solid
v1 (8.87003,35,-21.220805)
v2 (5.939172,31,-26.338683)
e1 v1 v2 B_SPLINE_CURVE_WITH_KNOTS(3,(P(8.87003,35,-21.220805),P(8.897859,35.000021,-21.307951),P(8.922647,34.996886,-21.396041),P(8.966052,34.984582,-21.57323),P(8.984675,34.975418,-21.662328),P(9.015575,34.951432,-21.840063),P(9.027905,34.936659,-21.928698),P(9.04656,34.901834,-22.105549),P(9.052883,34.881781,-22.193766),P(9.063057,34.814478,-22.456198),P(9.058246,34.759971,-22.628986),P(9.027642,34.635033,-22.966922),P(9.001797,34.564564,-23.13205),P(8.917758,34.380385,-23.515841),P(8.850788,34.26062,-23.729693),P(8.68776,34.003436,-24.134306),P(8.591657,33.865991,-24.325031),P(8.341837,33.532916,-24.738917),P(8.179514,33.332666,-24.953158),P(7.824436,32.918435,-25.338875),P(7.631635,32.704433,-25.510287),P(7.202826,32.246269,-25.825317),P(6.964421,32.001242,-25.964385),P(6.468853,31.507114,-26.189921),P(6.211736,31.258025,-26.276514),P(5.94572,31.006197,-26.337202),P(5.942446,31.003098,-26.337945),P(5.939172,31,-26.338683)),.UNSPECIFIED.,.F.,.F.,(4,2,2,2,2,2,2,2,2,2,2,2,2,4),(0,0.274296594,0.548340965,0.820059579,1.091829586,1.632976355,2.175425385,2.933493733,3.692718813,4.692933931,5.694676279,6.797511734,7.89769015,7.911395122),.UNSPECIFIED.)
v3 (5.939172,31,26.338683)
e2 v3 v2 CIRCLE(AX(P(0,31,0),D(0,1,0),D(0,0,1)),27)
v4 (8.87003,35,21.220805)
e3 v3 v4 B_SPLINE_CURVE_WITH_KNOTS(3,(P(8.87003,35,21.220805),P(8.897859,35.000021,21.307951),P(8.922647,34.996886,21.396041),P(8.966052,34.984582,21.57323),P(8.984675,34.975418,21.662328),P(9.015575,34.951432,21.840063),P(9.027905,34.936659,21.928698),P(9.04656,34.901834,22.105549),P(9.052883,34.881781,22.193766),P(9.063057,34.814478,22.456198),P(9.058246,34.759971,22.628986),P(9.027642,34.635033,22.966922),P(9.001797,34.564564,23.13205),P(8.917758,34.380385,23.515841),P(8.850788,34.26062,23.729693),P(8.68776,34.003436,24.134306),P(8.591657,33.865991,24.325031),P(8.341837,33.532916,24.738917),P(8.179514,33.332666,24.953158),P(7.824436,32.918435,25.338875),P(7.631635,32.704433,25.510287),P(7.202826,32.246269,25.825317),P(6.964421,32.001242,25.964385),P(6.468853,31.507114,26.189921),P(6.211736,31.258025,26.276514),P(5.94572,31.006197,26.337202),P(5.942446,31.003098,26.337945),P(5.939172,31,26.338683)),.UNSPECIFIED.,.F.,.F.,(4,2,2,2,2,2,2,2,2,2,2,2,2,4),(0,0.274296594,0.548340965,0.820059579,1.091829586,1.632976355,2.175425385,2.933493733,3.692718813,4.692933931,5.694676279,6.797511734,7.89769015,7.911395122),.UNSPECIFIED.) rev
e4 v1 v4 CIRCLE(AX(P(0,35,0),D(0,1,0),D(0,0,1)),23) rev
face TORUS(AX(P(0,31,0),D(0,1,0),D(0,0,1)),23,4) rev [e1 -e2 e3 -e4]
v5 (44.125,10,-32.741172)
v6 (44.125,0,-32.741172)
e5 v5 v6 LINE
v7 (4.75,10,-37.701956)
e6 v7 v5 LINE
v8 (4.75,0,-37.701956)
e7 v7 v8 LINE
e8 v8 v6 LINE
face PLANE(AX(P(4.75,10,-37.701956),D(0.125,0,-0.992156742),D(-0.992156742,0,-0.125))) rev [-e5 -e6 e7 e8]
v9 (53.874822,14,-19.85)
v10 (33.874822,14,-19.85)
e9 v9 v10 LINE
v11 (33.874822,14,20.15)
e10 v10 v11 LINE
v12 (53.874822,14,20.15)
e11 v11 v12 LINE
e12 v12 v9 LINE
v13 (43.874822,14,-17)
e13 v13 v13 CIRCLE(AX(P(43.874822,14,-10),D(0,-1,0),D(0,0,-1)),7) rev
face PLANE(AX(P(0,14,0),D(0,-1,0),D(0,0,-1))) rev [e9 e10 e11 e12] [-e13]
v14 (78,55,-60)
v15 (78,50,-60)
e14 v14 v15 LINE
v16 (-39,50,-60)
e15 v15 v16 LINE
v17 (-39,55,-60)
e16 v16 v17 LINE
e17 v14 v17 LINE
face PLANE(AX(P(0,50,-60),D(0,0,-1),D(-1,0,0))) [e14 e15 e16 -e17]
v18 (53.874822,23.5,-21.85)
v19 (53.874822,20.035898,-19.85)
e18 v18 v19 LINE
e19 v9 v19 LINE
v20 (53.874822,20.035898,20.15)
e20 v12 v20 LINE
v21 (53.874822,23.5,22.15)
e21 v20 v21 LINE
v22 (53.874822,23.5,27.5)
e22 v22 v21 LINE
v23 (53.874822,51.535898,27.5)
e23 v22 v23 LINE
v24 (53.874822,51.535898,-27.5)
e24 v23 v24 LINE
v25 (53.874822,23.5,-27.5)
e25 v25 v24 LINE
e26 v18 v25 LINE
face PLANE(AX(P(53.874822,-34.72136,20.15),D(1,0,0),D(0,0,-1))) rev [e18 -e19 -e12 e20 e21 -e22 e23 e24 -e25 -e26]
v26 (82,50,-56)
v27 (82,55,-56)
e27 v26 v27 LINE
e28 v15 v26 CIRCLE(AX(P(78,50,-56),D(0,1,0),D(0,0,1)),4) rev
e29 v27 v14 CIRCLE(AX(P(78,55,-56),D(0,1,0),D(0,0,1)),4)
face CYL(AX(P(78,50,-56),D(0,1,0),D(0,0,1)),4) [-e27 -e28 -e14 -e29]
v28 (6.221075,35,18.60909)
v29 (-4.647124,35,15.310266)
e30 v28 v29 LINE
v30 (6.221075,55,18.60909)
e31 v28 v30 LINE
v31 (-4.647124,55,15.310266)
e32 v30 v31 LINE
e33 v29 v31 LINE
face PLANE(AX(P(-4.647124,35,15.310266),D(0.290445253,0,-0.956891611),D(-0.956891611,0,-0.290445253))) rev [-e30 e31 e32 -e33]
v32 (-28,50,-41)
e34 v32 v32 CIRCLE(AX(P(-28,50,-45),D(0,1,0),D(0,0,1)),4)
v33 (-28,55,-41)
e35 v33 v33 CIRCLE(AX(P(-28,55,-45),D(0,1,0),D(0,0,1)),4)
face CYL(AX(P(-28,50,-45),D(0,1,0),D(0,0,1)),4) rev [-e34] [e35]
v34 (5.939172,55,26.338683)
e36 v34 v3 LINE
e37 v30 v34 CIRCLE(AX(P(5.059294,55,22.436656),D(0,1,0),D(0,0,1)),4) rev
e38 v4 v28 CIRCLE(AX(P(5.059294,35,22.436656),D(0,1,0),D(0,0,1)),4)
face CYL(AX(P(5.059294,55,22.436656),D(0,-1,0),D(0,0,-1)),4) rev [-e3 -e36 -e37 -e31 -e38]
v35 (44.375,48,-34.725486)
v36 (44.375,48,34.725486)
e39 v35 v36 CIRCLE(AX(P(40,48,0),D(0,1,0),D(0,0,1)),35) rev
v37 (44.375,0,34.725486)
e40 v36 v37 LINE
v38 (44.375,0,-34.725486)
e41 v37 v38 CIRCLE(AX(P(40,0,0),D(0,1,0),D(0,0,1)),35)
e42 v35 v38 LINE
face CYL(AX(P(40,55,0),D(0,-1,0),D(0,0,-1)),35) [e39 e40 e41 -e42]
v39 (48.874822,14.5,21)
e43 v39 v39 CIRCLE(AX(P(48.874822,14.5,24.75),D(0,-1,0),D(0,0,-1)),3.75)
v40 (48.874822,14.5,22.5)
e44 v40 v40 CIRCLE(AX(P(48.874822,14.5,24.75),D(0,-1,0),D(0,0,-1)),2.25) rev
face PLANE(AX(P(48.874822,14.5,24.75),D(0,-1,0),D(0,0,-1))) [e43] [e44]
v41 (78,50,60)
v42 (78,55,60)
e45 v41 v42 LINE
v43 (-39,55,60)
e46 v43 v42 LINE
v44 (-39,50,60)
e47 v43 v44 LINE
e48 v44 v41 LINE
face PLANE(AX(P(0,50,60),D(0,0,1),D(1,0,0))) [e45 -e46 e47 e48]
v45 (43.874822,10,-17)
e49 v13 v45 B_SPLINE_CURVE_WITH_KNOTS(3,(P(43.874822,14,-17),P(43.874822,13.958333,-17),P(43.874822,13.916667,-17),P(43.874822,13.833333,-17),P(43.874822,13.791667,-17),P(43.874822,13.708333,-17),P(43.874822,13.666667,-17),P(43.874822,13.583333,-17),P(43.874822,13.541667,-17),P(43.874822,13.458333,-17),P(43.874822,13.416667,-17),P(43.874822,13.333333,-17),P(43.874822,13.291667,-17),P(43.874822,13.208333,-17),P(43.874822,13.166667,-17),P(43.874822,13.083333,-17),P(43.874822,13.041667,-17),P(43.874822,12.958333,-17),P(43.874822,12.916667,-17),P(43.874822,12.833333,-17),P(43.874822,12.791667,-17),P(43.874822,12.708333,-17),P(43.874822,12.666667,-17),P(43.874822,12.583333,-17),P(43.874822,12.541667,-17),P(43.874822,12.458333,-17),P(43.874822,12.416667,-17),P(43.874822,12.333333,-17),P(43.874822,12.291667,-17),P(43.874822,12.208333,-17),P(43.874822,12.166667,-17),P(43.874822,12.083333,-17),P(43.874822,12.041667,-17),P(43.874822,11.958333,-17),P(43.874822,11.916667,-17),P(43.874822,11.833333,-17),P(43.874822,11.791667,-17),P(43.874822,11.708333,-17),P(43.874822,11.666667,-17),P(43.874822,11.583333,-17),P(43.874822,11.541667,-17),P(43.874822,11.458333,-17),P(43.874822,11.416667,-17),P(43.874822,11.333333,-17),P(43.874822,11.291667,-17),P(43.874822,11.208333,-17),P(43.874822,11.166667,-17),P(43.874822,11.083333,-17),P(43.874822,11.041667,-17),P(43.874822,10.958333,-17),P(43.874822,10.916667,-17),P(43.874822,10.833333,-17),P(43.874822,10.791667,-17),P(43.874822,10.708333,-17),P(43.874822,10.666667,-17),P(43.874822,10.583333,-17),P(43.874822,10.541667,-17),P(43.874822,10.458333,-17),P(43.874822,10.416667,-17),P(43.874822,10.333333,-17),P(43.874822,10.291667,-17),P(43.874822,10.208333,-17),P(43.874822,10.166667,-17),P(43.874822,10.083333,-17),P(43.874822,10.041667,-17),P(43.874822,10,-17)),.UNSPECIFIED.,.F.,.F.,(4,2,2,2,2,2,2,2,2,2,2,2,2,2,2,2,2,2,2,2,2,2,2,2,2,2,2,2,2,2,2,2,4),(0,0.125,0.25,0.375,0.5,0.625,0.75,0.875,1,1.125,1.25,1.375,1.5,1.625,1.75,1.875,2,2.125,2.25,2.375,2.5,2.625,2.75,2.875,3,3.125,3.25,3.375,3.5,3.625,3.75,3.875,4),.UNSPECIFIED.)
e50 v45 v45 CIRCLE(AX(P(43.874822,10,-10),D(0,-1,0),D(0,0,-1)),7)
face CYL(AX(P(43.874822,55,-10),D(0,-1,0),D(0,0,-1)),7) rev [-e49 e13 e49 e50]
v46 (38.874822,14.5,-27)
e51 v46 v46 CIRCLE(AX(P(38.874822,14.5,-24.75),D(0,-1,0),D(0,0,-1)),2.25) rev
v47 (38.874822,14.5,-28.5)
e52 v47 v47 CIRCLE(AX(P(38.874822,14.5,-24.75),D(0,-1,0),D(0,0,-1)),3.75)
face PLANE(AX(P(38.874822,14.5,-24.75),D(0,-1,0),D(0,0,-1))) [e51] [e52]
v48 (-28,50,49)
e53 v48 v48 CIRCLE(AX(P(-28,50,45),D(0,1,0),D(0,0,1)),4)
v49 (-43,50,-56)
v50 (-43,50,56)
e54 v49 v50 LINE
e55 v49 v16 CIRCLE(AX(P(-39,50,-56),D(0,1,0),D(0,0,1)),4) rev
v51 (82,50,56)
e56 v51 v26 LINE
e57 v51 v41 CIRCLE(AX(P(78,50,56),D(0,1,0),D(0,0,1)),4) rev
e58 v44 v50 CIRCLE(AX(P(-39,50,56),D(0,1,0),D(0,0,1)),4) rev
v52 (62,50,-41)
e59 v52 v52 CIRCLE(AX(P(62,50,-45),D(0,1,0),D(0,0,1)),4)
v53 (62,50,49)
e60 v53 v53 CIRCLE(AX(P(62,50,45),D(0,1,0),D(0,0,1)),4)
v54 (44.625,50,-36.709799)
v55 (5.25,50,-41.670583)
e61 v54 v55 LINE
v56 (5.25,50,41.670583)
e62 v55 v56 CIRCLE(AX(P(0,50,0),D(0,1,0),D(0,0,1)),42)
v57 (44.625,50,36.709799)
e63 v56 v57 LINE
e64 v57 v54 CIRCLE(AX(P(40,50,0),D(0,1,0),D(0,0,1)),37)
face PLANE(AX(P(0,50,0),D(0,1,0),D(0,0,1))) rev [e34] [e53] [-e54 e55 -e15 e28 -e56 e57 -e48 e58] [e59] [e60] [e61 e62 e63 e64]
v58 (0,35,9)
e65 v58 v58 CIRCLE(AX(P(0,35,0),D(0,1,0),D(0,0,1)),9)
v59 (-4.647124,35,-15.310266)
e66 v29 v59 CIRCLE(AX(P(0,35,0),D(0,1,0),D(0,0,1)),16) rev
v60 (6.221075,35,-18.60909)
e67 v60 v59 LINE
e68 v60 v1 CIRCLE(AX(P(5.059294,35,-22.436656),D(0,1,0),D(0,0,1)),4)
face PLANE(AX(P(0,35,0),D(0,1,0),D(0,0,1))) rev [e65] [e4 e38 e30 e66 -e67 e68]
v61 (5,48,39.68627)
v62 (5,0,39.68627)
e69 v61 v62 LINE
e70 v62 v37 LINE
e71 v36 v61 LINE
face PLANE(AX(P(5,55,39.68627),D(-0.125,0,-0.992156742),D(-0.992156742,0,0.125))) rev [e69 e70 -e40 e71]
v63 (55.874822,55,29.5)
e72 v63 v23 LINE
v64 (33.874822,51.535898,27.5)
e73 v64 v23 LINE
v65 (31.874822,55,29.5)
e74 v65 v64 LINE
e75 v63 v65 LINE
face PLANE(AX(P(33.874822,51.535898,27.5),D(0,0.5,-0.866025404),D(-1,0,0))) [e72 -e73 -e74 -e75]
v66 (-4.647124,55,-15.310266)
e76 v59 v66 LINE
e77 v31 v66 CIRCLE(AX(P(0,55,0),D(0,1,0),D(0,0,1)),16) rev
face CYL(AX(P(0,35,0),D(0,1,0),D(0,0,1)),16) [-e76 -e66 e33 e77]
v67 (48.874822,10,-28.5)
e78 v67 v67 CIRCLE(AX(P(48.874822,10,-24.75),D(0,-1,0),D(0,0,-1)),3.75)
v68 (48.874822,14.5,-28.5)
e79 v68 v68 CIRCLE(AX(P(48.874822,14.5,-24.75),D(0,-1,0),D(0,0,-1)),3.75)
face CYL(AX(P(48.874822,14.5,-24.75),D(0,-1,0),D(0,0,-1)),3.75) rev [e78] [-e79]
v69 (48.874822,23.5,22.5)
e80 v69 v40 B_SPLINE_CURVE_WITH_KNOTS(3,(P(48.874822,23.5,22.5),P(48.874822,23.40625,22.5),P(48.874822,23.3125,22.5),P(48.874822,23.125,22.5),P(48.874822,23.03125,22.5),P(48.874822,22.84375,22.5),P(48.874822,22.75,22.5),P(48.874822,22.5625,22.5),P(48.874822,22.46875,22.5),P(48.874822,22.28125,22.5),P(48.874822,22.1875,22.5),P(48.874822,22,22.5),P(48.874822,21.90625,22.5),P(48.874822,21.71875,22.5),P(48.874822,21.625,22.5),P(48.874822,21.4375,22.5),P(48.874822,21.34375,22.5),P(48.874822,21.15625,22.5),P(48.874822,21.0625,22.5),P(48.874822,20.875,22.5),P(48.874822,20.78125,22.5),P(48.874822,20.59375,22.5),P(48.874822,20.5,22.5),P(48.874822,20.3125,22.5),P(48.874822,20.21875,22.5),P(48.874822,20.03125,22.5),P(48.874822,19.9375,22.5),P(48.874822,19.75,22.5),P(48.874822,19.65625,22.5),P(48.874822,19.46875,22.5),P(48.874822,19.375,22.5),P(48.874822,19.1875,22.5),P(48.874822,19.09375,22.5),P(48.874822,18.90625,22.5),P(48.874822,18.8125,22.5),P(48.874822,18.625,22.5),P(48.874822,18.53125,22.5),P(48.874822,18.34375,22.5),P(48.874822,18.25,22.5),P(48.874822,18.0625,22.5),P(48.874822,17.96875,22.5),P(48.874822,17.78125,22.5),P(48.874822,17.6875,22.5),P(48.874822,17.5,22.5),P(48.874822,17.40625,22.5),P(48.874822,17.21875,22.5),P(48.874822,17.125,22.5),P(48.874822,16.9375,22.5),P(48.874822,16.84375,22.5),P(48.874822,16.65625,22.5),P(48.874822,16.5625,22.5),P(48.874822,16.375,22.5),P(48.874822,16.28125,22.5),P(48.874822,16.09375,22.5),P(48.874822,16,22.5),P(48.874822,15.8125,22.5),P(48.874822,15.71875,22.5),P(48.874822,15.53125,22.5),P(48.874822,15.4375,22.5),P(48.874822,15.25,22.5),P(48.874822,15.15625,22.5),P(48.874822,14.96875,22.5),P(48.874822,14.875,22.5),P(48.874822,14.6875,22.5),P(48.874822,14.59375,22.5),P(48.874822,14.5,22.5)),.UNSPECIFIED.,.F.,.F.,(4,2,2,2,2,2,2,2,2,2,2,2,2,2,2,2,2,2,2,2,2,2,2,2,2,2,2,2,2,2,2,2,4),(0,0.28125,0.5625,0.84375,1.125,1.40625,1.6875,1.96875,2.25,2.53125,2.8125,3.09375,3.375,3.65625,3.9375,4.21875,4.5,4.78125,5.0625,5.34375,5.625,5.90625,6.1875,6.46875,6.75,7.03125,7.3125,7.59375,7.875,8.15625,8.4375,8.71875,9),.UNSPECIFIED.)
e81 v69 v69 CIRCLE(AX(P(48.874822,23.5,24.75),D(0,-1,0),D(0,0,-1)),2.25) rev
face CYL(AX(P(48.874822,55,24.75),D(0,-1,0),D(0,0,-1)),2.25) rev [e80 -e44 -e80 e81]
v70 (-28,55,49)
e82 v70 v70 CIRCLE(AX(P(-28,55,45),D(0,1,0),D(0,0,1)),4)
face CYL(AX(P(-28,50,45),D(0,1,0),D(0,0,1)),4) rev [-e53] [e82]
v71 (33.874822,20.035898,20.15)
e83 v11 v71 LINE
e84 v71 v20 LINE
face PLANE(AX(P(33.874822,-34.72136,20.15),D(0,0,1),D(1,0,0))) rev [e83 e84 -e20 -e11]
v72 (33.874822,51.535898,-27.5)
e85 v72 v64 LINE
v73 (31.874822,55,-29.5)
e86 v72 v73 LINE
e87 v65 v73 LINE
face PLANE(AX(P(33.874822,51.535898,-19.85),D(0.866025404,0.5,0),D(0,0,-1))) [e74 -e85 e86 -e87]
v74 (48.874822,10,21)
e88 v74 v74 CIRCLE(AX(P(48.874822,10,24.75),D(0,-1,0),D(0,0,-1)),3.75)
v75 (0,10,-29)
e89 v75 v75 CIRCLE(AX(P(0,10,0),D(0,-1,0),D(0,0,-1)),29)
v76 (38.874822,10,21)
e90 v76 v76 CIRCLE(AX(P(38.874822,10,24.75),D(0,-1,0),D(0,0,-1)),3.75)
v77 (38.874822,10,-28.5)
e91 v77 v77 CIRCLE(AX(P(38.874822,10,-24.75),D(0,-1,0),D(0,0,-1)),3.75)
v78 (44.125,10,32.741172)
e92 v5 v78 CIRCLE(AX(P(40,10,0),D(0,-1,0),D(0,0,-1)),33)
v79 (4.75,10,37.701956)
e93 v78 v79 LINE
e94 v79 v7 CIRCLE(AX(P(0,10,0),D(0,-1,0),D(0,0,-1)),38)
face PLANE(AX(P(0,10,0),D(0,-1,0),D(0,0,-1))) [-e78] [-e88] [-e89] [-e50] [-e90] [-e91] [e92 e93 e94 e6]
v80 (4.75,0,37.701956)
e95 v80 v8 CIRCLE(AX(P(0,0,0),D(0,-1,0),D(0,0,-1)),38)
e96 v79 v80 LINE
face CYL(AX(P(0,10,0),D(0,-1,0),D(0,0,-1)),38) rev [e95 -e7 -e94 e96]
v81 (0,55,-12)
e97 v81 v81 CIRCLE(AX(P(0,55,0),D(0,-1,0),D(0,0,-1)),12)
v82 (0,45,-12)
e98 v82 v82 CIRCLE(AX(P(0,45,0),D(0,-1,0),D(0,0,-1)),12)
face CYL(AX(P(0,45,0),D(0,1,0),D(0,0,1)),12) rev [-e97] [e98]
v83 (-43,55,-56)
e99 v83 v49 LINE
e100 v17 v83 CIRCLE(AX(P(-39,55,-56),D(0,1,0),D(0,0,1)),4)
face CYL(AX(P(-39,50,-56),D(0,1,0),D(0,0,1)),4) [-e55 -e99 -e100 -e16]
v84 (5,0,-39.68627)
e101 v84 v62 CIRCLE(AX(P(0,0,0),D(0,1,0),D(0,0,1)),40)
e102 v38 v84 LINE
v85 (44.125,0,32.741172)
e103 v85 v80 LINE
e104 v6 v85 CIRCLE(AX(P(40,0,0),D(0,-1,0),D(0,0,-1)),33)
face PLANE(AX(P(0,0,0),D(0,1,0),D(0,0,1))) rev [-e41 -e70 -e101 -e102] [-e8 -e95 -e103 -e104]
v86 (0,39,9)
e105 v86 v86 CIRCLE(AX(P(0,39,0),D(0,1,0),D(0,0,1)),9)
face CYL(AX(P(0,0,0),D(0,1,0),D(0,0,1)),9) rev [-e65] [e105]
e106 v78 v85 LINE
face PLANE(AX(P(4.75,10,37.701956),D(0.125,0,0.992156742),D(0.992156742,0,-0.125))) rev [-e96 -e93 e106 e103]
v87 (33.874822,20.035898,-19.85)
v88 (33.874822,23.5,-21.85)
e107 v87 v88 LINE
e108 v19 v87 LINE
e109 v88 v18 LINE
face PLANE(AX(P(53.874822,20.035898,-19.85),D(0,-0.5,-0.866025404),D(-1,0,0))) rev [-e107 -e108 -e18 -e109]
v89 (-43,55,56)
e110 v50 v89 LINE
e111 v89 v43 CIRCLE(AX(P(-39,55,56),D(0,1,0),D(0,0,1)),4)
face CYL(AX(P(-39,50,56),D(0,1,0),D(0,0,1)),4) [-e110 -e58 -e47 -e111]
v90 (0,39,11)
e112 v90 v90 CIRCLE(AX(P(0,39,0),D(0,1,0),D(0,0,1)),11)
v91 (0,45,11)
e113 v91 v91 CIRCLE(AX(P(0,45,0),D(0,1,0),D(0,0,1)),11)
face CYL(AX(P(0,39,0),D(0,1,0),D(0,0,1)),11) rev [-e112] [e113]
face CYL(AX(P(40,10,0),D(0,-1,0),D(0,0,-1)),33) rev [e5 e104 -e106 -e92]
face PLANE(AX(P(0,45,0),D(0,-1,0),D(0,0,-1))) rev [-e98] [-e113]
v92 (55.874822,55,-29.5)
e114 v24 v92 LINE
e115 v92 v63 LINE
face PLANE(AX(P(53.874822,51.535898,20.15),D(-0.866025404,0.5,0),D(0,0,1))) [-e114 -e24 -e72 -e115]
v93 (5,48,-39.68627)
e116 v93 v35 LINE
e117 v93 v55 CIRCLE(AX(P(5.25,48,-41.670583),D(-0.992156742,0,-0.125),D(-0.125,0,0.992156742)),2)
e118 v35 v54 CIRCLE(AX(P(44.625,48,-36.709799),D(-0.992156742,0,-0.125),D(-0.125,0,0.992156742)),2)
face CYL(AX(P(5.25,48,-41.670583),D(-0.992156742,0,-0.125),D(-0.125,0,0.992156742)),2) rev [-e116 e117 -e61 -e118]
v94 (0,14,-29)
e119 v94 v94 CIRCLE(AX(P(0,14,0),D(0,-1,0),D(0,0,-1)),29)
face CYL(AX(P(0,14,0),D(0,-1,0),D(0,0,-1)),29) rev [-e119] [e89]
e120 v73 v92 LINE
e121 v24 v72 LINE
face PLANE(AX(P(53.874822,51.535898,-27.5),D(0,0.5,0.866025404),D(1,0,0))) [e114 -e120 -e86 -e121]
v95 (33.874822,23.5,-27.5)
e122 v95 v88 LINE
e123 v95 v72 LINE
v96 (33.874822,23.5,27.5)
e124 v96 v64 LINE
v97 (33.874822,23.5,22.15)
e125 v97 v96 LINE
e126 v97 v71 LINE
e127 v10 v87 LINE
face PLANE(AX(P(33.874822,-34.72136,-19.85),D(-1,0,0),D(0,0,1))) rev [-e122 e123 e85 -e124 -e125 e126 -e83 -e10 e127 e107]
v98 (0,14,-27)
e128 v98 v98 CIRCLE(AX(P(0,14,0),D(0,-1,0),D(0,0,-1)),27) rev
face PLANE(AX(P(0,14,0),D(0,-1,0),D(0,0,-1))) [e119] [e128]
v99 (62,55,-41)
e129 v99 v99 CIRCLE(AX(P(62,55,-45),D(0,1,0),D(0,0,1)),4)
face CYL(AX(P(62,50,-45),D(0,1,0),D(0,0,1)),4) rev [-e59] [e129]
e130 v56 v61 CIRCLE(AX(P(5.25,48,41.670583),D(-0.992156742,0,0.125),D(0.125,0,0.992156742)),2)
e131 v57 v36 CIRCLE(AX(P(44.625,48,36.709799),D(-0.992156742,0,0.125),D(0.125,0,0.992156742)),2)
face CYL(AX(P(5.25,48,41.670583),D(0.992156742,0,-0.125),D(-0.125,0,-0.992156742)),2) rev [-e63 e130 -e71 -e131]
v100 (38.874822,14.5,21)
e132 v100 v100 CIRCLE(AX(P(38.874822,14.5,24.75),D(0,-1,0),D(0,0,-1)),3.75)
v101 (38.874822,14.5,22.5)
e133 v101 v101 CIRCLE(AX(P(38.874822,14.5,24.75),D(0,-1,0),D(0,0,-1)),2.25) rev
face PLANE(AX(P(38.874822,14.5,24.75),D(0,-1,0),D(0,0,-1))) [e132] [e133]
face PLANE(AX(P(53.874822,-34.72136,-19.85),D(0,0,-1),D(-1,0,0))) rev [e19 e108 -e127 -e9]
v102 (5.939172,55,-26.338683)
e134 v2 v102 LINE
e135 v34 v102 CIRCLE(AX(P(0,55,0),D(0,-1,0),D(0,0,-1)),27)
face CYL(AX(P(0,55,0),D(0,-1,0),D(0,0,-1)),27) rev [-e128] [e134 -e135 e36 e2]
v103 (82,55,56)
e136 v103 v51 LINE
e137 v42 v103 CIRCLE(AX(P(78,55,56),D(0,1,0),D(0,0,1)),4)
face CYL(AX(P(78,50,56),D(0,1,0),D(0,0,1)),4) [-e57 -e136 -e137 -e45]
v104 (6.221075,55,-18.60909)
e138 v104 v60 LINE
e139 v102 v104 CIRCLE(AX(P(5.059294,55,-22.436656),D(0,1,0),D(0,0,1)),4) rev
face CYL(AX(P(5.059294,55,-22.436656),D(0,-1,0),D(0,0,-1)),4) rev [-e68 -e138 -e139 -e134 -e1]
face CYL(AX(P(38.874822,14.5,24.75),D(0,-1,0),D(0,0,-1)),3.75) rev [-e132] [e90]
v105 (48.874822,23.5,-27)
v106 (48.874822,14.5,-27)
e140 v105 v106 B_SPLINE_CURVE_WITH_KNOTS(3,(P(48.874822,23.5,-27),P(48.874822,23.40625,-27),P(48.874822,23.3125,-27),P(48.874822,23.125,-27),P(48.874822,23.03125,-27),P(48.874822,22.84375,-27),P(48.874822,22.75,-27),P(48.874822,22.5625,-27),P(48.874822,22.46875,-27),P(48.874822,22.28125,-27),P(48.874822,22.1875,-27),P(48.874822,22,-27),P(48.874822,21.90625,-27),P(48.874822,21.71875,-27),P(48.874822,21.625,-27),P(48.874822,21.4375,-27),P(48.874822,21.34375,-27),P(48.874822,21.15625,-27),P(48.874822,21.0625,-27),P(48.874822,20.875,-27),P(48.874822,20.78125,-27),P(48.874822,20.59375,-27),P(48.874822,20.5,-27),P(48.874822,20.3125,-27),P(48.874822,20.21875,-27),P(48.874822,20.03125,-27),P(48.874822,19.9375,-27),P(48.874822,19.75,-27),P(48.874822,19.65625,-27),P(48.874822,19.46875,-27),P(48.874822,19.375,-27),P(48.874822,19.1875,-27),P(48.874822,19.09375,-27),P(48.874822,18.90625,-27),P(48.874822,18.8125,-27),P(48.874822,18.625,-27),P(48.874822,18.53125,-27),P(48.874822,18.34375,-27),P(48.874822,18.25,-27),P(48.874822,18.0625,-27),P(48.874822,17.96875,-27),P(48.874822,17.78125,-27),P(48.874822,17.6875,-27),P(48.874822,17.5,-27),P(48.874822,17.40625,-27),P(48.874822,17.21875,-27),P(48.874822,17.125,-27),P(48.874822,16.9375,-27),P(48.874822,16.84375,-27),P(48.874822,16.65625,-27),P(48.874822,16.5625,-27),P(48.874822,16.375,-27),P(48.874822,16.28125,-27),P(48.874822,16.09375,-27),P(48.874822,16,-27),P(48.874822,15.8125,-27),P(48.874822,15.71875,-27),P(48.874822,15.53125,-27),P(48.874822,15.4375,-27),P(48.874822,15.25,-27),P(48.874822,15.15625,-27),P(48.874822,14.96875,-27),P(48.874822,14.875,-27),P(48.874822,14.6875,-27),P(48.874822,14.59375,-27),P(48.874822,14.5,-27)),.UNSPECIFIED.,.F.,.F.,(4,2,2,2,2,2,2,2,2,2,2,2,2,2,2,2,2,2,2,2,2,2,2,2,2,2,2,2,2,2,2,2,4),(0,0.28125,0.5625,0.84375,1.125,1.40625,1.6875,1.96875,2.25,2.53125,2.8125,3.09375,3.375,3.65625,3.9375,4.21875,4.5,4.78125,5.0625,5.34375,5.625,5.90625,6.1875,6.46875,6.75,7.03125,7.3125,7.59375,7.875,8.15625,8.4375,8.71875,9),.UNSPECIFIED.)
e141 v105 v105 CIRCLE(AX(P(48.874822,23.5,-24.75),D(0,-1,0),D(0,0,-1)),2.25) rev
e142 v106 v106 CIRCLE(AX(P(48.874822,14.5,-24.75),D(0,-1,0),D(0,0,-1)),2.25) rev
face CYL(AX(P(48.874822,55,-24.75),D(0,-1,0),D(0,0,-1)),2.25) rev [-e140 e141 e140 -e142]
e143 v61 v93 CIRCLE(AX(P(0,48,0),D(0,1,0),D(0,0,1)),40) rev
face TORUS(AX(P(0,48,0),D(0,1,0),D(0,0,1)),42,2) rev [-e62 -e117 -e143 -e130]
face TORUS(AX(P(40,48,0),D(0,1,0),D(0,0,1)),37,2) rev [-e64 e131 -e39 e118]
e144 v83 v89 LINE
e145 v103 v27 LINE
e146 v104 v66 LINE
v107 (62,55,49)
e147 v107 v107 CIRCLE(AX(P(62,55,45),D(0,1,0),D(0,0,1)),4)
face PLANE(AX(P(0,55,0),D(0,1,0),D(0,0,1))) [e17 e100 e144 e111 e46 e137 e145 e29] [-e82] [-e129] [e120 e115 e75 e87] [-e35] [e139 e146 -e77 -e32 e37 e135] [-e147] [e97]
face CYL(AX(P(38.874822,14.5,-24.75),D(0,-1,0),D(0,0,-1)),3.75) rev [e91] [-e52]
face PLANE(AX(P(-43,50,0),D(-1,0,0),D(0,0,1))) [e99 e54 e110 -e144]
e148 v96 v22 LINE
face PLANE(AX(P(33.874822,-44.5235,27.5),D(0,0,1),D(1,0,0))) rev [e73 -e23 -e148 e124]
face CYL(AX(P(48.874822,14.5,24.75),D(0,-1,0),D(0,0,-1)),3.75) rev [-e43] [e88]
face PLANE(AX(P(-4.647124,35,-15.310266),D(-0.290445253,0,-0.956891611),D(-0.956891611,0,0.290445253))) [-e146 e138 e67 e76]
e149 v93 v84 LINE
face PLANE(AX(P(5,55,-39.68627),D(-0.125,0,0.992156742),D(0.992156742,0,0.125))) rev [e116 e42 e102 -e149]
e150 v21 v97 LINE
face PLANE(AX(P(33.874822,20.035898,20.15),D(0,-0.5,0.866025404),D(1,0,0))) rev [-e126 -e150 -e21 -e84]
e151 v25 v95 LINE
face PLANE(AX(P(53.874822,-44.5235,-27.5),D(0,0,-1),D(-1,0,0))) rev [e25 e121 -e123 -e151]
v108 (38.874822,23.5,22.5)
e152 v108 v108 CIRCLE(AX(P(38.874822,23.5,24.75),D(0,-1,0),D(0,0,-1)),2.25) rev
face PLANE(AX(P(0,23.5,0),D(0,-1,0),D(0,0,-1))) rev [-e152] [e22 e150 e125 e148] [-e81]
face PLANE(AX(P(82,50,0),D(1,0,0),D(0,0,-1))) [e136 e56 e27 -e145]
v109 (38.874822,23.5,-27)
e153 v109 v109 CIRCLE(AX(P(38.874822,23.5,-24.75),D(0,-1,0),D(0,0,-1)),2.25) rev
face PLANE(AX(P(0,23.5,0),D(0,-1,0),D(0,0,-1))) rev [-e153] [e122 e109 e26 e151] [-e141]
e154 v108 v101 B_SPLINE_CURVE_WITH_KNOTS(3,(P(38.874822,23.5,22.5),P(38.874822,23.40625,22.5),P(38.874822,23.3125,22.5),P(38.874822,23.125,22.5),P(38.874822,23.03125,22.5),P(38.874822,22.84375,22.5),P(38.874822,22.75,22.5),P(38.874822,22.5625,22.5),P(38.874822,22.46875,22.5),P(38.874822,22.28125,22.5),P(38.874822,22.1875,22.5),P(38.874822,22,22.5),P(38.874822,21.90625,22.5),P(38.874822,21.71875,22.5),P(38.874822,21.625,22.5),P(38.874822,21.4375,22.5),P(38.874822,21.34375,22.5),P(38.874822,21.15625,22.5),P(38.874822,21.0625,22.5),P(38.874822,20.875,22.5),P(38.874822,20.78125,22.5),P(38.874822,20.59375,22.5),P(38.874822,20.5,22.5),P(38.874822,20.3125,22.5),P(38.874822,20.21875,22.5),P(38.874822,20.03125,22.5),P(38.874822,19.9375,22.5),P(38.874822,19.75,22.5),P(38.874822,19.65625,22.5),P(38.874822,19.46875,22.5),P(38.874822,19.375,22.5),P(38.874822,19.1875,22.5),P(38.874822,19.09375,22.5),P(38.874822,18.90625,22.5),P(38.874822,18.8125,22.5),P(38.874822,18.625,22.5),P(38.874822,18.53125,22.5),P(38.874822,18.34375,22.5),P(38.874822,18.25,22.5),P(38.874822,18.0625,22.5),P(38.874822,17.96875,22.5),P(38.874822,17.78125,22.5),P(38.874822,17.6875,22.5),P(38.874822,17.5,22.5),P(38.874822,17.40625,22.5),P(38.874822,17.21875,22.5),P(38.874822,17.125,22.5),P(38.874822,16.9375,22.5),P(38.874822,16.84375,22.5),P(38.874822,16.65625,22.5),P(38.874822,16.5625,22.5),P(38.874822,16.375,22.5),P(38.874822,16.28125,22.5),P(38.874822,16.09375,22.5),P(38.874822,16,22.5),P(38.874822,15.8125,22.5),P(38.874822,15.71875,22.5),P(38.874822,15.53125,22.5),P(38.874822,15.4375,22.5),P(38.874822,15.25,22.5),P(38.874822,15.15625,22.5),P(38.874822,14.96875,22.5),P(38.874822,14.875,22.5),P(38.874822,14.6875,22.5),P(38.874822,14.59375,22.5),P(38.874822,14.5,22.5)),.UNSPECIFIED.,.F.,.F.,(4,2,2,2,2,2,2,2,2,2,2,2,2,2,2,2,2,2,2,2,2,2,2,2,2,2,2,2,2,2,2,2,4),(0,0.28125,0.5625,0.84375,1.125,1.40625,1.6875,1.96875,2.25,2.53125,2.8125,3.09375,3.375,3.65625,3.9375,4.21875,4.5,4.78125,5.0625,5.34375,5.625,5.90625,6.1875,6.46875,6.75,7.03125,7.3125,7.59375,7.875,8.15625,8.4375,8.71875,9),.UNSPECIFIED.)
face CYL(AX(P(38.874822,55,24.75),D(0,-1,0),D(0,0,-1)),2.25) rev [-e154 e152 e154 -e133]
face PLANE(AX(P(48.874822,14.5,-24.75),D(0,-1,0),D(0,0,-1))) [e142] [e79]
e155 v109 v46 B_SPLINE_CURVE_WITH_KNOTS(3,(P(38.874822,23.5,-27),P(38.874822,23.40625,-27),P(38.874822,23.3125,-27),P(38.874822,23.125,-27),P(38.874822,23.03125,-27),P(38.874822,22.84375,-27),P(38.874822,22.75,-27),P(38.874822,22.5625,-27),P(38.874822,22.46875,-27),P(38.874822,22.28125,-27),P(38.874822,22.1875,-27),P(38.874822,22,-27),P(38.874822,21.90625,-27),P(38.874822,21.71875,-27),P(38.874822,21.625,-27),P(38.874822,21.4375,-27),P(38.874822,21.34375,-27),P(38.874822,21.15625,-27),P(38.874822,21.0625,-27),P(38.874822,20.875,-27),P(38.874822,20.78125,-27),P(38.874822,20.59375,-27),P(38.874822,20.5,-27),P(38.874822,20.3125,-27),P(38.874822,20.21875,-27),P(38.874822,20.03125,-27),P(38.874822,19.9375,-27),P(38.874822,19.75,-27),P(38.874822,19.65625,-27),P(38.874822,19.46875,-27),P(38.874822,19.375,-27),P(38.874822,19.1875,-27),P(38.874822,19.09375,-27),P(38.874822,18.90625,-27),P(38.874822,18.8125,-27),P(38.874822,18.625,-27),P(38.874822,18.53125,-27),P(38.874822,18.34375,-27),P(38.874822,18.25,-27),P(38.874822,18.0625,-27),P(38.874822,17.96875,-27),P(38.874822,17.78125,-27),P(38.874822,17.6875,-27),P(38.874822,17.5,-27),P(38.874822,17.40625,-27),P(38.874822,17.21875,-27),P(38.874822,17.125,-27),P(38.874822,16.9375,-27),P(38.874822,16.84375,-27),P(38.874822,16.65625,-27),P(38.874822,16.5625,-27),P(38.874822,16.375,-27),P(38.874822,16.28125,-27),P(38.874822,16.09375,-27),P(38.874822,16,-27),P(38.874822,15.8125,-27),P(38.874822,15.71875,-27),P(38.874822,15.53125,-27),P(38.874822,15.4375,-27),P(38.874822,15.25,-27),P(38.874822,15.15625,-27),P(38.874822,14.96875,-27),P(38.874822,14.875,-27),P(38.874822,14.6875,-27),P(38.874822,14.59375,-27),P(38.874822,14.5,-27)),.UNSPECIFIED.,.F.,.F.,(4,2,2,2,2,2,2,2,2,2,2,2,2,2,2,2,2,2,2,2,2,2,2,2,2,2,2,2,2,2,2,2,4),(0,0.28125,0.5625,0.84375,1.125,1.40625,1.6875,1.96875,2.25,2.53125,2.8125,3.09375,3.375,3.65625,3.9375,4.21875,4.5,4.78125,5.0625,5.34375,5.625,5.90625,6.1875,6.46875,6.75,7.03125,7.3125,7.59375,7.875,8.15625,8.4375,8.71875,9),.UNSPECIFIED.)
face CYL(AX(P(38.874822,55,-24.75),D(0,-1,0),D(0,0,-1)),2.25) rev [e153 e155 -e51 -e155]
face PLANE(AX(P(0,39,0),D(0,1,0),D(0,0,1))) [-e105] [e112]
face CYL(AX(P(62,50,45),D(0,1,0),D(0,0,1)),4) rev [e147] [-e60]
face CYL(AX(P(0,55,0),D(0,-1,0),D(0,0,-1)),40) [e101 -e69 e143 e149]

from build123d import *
from OCP.BRepFilletAPI import BRepFilletAPI_MakeChamfer

# Parameters (mm, degrees)
EXTRUDE_1_DEPTH      = 55
SKETCH_2_R           = 4
EXTRUDE_2_DEPTH      = 5
CUT_EXTRUDE_2_DEPTH  = 10
SKETCH_4_R           = 27
CUT_EXTRUDE_1_DEPTH  = 112.126054551
SKETCH_5_R           = 29
CUT_EXTRUDE_3_DEPTH  = 4
SKETCH_8_R           = 7
CUT_EXTRUDE_4_DEPTH  = 112.126054551
SKETCH_7_R           = 2.25
CUT_EXTRUDE_5_DEPTH  = 112.126054551
SKETCH_10_W          = 20
SKETCH_10_H          = 40
CUT_EXTRUDE_6_DEPTH  = 41
SKETCH_11_W          = 20
SKETCH_11_H          = 55
CUT_EXTRUDE_7_DEPTH  = 31.5
SKETCH_12_R          = 3.75
CUT_EXTRUDE_8_DEPTH  = 4.5
CHAMFER_1_SIZE       = 2
CHAMFER_1_SIZE2      = 3.464101615
EXTRUDE_3_DEPTH      = 20
SKETCH_14_R          = 12
CUT_EXTRUDE_9_DEPTH  = 10
SKETCH_15_R          = 11
CUT_EXTRUDE_10_DEPTH = 6
SKETCH_16_R          = 9
CUT_EXTRUDE_11_DEPTH = 109.834737102
FILLET_START         = 36.8876
FILLET_1_DEPTH       = 19.1124
FILLET_START_2       = 30.9999999
FILLET_1_2_OUTLINE_R = 27
FILLET_1_2_DEPTH     = 4.0000001
FILLET_START_3       = 35
FILLET_1_3_DEPTH     = 20
FILLET_1_5_DEPTH     = 4.0000001
CHAMFER_2_SIZE       = 2
CHAMFER_2_SIZE2      = 3.464101615
FILLET_2_R           = 2


with BuildPart() as part:
    # 草图1 → 凸台-拉伸1 (new body)
    with BuildSketch(Plane(origin=(0, 0, 0), x_dir=(1, 0, 0), z_dir=(0, 1, 0))):
        with BuildLine():
            Line((5, 39.686269666), (44.375, 34.725485958))
            ThreePointArc((44.375, 34.725485958), (75, 0), (44.375, -34.725485958))
            Line((44.375, -34.725485958), (5, -39.686269666))
            ThreePointArc((5, -39.686269666), (-40, 0), (5, 39.686269666))
        make_face()
    extrude(amount=EXTRUDE_1_DEPTH)

    # 草图6 → 切除-拉伸2 (cut)
    with BuildSketch(Plane.XZ):
        with BuildLine():
            Line((4.75, -37.701956183), (44.125, -32.741172474))
            ThreePointArc((44.125, -32.741172474), (73, 0), (44.125, 32.741172474))
            Line((44.125, 32.741172474), (4.75, 37.701956183))
            ThreePointArc((4.75, 37.701956183), (-38, 0), (4.75, -37.701956183))
        make_face()
    extrude(amount=-CUT_EXTRUDE_2_DEPTH, mode=Mode.SUBTRACT)

    # 草图4 → 切除-拉伸1 (cut, through all)
    with BuildSketch(Plane.XZ.offset(-10)):
        with Locations(Location((0, 0, 0), (0, 0, 270))):
            Circle(SKETCH_4_R)
    extrude(amount=-CUT_EXTRUDE_1_DEPTH, mode=Mode.SUBTRACT)

    # 草图5 → 切除-拉伸3 (cut)
    with BuildSketch(Plane.XZ.offset(-10)):
        with Locations(Location((0, 0, 0), (0, 0, 270))):
            Circle(SKETCH_5_R)
    extrude(amount=-CUT_EXTRUDE_3_DEPTH, mode=Mode.SUBTRACT)

    # 草图8 → 切除-拉伸4 (cut, through all)
    with BuildSketch(Plane(origin=(0, 10, 0), x_dir=(-1, 0, 0), z_dir=(0, -1, 0))):
        with Locations(Location((-43.874821937, 10, 0), (0, 0, 90))):
            Circle(SKETCH_8_R)
    extrude(amount=-CUT_EXTRUDE_4_DEPTH, mode=Mode.SUBTRACT)

    # 草图7 → 切除-拉伸5 (cut, through all)
    with BuildSketch(Plane.XZ.offset(-10)):
        with Locations(Location((38.874821937, 24.75, 0), (0, 0, 270))):
            Circle(SKETCH_7_R)
        with Locations(Location((48.874821937, 24.75, 0), (0, 0, 270))):
            Circle(SKETCH_7_R)
        with Locations(Location((48.874821937, -24.75, 0), (0, 0, 270))):
            Circle(SKETCH_7_R)
        with Locations(Location((38.874821937, -24.75, 0), (0, 0, 270))):
            Circle(SKETCH_7_R)
    extrude(amount=-CUT_EXTRUDE_5_DEPTH, mode=Mode.SUBTRACT)

    # 草图10 → 切除-拉伸6 (cut)
    with BuildSketch(Plane(origin=(0, 55, 0), x_dir=(1, 0, 0), z_dir=(0, 1, 0))):
        with Locations((43.874821937, -0.15)):
            Rectangle(SKETCH_10_W, SKETCH_10_H)
    extrude(amount=-CUT_EXTRUDE_6_DEPTH, mode=Mode.SUBTRACT)

    # 草图11 → 切除-拉伸7 (cut)
    with BuildSketch(Plane(origin=(0, 55, 0), x_dir=(1, 0, 0), z_dir=(0, 1, 0))):
        with Locations((43.874821937, 0)):
            Rectangle(SKETCH_11_W, SKETCH_11_H)
    extrude(amount=-CUT_EXTRUDE_7_DEPTH, mode=Mode.SUBTRACT)

    # 草图12 → 切除-拉伸8 (cut)
    with BuildSketch(Plane.XZ.offset(-10)):
        with Locations(Location((38.874821937, 24.75, 0), (0, 0, 270))):
            Circle(SKETCH_12_R)
        with Locations(Location((48.874821937, 24.75, 0), (0, 0, 270))):
            Circle(SKETCH_12_R)
        with Locations(Location((48.874821937, -24.75, 0), (0, 0, 270))):
            Circle(SKETCH_12_R)
        with Locations(Location((38.874821937, -24.75, 0), (0, 0, 270))):
            Circle(SKETCH_12_R)
    extrude(amount=-CUT_EXTRUDE_8_DEPTH, mode=Mode.SUBTRACT)

    # 倒角1: one chamfer whose edges measure the first distance from different faces: ONE call of the kernel's chamfer builder (chamfer() names one face for all edges)
    chamfer_1_edges_1 = [part.edges().sort_by_distance(p)[0] for p in [
        (43.874821937, 23.5, -19.85),
    ]]
    chamfer_1_side_1 = [part.faces().sort_by_distance(p)[0] for p in [
        (43.874821937, 23.5, -23.392848958),
    ]]
    chamfer_1_edges_2 = [part.edges().sort_by_distance(p)[0] for p in [
        (43.874821937, 23.5, 20.15),
    ]]
    chamfer_1_side_2 = [part.faces().sort_by_distance(p)[0] for p in [
        (43.874821937, 23.5, 23.569573074),
    ]]
    chamfer_1 = BRepFilletAPI_MakeChamfer(part.part.solid().wrapped)
    for e in chamfer_1_edges_1:
        chamfer_1.Add(CHAMFER_1_SIZE, CHAMFER_1_SIZE2, e.wrapped, chamfer_1_side_1[0].wrapped)  # the first distance lies on this face
    for e in chamfer_1_edges_2:
        chamfer_1.Add(CHAMFER_1_SIZE, CHAMFER_1_SIZE2, e.wrapped, chamfer_1_side_2[0].wrapped)  # the first distance lies on this face
    add(Compound.cast(chamfer_1.Shape()), mode=Mode.REPLACE)


with BuildPart() as body_2:
    # 草图2 → 凸台-拉伸2 (new body)
    # profile 1 of 4: a face of its own
    with BuildSketch(Plane(origin=(0, 55, 0), x_dir=(1, 0, 0), z_dir=(0, 1, 0))):
        with BuildLine():
            Line((-40, 0), (-43, 0))
            Line((-43, 0), (-43, -60))
            Line((-43, -60), (82, -60))
            Line((82, -60), (82, 0))
            Line((82, 0), (75, 0))
            ThreePointArc((75, 0), (66.25, -23.150323972), (44.375, -34.725485958))
            Line((44.375, -34.725485958), (5, -39.686269666))
            ThreePointArc((5, -39.686269666), (-26.457513111, -30), (-40, 0))
        make_face()
        with Locations(Location((-28, -45, 0), (0, 0, 270))):
            Circle(SKETCH_2_R, mode=Mode.SUBTRACT)
        with Locations(Location((62, -45, 0), (0, 0, 270))):
            Circle(SKETCH_2_R, mode=Mode.SUBTRACT)
    # profile 2 of 4: a face of its own
    with BuildSketch(Plane(origin=(0, 55, 0), x_dir=(1, 0, 0), z_dir=(0, 1, 0))):
        with BuildLine():
            Line((82, 60), (-43, 60))
            Line((-43, 60), (-43, 0))
            Line((-43, 0), (-40, 0))
            ThreePointArc((-40, 0), (-26.457513111, 30), (5, 39.686269666))
            Line((5, 39.686269666), (44.375, 34.725485958))
            ThreePointArc((44.375, 34.725485958), (66.25, 23.150323972), (75, 0))
            Line((75, 0), (82, 0))
            Line((82, 0), (82, 60))
        make_face()
        with Locations(Location((-28, 45, 0), (0, 0, 270))):
            Circle(SKETCH_2_R, mode=Mode.SUBTRACT)
        with Locations(Location((62, 45, 0), (0, 0, 270))):
            Circle(SKETCH_2_R, mode=Mode.SUBTRACT)
    # profile 3 of 4: a face of its own
    with BuildSketch(Plane(origin=(0, 55, 0), x_dir=(1, 0, 0), z_dir=(0, 1, 0))):
        with BuildLine():
            Line((-37, 0), (-40, 0))
            ThreePointArc((-40, 0), (-26.457513111, -30), (5, -39.686269666))
            Line((5, -39.686269666), (44.375, -34.725485958))
            ThreePointArc((44.375, -34.725485958), (66.25, -23.150323972), (75, 0))
            Line((75, 0), (72, 0))
            ThreePointArc((72, 0), (64, -21.166010489), (44, -31.749015733))
            Line((44, -31.749015733), (4.625, -36.709799441))
            ThreePointArc((4.625, -36.709799441), (-24.473199627, -27.75), (-37, 0))
        make_face()
    # profile 4 of 4: a face of its own
    with BuildSketch(Plane(origin=(0, 55, 0), x_dir=(1, 0, 0), z_dir=(0, 1, 0))):
        with BuildLine():
            ThreePointArc((5, 39.686269666), (-26.457513111, 30), (-40, 0))
            Line((-40, 0), (-37, 0))
            ThreePointArc((-37, 0), (-24.473199627, 27.75), (4.625, 36.709799441))
            Line((4.625, 36.709799441), (44, 31.749015733))
            ThreePointArc((44, 31.749015733), (64, 21.166010489), (72, 0))
            Line((72, 0), (75, 0))
            ThreePointArc((75, 0), (66.25, 23.150323972), (44.375, 34.725485958))
            Line((44.375, 34.725485958), (5, 39.686269666))
        make_face()
    extrude(amount=-EXTRUDE_2_DEPTH)


    add(part.part)  # 凸台-拉伸3 merges part
    # 草图13 → 凸台-拉伸3 (add)
    with BuildSketch(Plane(origin=(0, 55, 0), x_dir=(-1, 0, 0), z_dir=(0, -1, 0))):
        with BuildLine():
            Line((-27.276363394, 25), (-27.276363394, -25))
            Line((-27.276363394, -25), (4.647124051, -15.310265774))
            ThreePointArc((4.647124051, -15.310265774), (16, 0), (4.647124051, 15.310265774))
            Line((4.647124051, 15.310265774), (-27.276363394, 25))
        make_face()
    extrude(amount=EXTRUDE_3_DEPTH)

    # 草图14 → 切除-拉伸9 (cut)
    with BuildSketch(Plane(origin=(0, 55, 0), x_dir=(-1, 0, 0), z_dir=(0, -1, 0))):
        with Locations(Location((0, 0, 0), (0, 0, 90))):
            Circle(SKETCH_14_R)
    extrude(amount=CUT_EXTRUDE_9_DEPTH, mode=Mode.SUBTRACT)

    # 草图15 → 切除-拉伸10 (cut)
    with BuildSketch(Plane(origin=(0, 45, 0), x_dir=(1, 0, 0), z_dir=(0, 1, 0))):
        with Locations(Location((0, 0, 0), (0, 0, 270))):
            Circle(SKETCH_15_R)
    extrude(amount=-CUT_EXTRUDE_10_DEPTH, mode=Mode.SUBTRACT)

    # 草图16 → 切除-拉伸11 (cut, through all)
    with BuildSketch(Plane(origin=(0, 39, 0), x_dir=(1, 0, 0), z_dir=(0, 1, 0))):
        with Locations(Location((0, 0, 0), (0, 0, 270))):
            Circle(SKETCH_16_R)
    extrude(amount=-CUT_EXTRUDE_11_DEPTH, mode=Mode.SUBTRACT)

    # 圆角1: read off the stored shape, not the designer's step
    # 圆角1 outline → 圆角1 (cut)
    with BuildSketch(Plane(origin=(0, 0, 0), x_dir=(1, 0, 0), z_dir=(0, 1, 0)).offset(FILLET_START)):
        with BuildLine():
            ThreePointArc((-43, 56), (-41.828427125, 58.828427125), (-39, 60))
            Line((-39, 60), (-43, 60))
            Line((-43, 60), (-43, 56))
        make_face()
        with BuildLine():
            Line((82, 60), (78, 60))
            ThreePointArc((78, 60), (80.828427125, 58.828427125), (82, 56))
            Line((82, 56), (82, 60))
        make_face()
        with BuildLine():
            ThreePointArc((-39, -60), (-41.828427125, -58.828427125), (-43, -56))
            Line((-43, -56), (-43, -60))
            Line((-43, -60), (-39, -60))
        make_face()
        with BuildLine():
            Line((82, -60), (82, -56))
            ThreePointArc((82, -56), (80.828427125, -58.828427125), (78, -60))
            Line((78, -60), (82, -60))
        make_face()
    extrude(amount=FILLET_1_DEPTH, mode=Mode.SUBTRACT)

    # Fillet 1 2 outline → Fillet 1 2 (add)
    with BuildSketch(Plane(origin=(0, 0, 0), x_dir=(1, 0, 0), z_dir=(0, 1, 0)).offset(FILLET_START_2)):
        Circle(FILLET_1_2_OUTLINE_R)
    extrude(amount=FILLET_1_2_DEPTH)

    # Fillet 1 3 outline → Fillet 1 3 (add)
    with BuildSketch(Plane(origin=(0, 0, 0), x_dir=(1, 0, 0), z_dir=(0, 1, 0)).offset(FILLET_START_3)):
        with BuildLine():
            ThreePointArc((16.163893596, 21.62703271), (11.299835716, 24.521698816), (5.939171742, 26.33868332))
            ThreePointArc((5.939171742, 26.33868332), (9.056636873, 22.582442052), (6.221075459, 18.609089718))
            Line((6.221075459, 18.609089718), (16.163893596, 21.62703271))
        make_face()
        with BuildLine():
            ThreePointArc((6.221075459, -18.609089718), (9.056636873, -22.582442052), (5.939171742, -26.33868332))
            ThreePointArc((5.939171742, -26.33868332), (11.299835716, -24.521698816), (16.163893596, -21.62703271))
            Line((16.163893596, -21.62703271), (6.221075459, -18.609089718))
        make_face()
    extrude(amount=FILLET_1_3_DEPTH)

    # Fillet 1 4 outline → Fillet 1 4 (revolve, cut)
    with BuildSketch(Plane.XY):
        with BuildLine():
            Line((0, 31), (27, 31))
            ThreePointArc((27, 31), (25.828427125, 33.828427125), (23, 35))
            Line((23, 35), (0, 35))
            Line((0, 35), (0, 31))
        make_face()
    revolve(axis=Axis((0, 0, 0), (0, 1, 0)), mode=Mode.SUBTRACT)

    # Fillet 1 5 outline → Fillet 1 5 (cut)
    with BuildSketch(Plane(origin=(0, 0, 0), x_dir=(1, 0, 0), z_dir=(0, 1, 0)).offset(FILLET_START_2)):
        with BuildLine():
            ThreePointArc((5.939171742, -26.33868332), (8.530408379, -24.424460998), (8.870030077, -21.220805037))
            ThreePointArc((8.870030077, -21.220805037), (-23, 0), (8.870030077, 21.220805037))
            ThreePointArc((8.870030077, 21.220805037), (8.530408379, 24.424460998), (5.939171742, 26.33868332))
            ThreePointArc((5.939171742, 26.33868332), (-27, 0), (5.939171742, -26.33868332))
        make_face()
    extrude(amount=FILLET_1_5_DEPTH, mode=Mode.SUBTRACT)

    # 倒角2
    chamfer_2_edges = [body_2.edges().sort_by_distance(p)[0] for p in [
        (33.874821937, 55, 0),
        (53.874821937, 55, 0),
        (43.874821937, 55, -27.5),
        (43.874821937, 55, 27.5),
    ]]
    chamfer_2_side = [body_2.faces().sort_by_distance(p)[0] for p in [
        (20.277724575, 55, 0),
    ]]
    chamfer(chamfer_2_edges, length=CHAMFER_2_SIZE, length2=CHAMFER_2_SIZE2, reference=chamfer_2_side[0])

    # 圆角2
    fillet_2_edges = [body_2.edges().sort_by_distance(p)[0] for p in [
        (-40, 50, 0),
        (24.6875, 50, 37.205877812),
        (75, 50, 0),
        (24.6875, 50, -37.205877812),
    ]]
    fillet(fillet_2_edges, radius=FILLET_2_R)


solid = body_2.part
